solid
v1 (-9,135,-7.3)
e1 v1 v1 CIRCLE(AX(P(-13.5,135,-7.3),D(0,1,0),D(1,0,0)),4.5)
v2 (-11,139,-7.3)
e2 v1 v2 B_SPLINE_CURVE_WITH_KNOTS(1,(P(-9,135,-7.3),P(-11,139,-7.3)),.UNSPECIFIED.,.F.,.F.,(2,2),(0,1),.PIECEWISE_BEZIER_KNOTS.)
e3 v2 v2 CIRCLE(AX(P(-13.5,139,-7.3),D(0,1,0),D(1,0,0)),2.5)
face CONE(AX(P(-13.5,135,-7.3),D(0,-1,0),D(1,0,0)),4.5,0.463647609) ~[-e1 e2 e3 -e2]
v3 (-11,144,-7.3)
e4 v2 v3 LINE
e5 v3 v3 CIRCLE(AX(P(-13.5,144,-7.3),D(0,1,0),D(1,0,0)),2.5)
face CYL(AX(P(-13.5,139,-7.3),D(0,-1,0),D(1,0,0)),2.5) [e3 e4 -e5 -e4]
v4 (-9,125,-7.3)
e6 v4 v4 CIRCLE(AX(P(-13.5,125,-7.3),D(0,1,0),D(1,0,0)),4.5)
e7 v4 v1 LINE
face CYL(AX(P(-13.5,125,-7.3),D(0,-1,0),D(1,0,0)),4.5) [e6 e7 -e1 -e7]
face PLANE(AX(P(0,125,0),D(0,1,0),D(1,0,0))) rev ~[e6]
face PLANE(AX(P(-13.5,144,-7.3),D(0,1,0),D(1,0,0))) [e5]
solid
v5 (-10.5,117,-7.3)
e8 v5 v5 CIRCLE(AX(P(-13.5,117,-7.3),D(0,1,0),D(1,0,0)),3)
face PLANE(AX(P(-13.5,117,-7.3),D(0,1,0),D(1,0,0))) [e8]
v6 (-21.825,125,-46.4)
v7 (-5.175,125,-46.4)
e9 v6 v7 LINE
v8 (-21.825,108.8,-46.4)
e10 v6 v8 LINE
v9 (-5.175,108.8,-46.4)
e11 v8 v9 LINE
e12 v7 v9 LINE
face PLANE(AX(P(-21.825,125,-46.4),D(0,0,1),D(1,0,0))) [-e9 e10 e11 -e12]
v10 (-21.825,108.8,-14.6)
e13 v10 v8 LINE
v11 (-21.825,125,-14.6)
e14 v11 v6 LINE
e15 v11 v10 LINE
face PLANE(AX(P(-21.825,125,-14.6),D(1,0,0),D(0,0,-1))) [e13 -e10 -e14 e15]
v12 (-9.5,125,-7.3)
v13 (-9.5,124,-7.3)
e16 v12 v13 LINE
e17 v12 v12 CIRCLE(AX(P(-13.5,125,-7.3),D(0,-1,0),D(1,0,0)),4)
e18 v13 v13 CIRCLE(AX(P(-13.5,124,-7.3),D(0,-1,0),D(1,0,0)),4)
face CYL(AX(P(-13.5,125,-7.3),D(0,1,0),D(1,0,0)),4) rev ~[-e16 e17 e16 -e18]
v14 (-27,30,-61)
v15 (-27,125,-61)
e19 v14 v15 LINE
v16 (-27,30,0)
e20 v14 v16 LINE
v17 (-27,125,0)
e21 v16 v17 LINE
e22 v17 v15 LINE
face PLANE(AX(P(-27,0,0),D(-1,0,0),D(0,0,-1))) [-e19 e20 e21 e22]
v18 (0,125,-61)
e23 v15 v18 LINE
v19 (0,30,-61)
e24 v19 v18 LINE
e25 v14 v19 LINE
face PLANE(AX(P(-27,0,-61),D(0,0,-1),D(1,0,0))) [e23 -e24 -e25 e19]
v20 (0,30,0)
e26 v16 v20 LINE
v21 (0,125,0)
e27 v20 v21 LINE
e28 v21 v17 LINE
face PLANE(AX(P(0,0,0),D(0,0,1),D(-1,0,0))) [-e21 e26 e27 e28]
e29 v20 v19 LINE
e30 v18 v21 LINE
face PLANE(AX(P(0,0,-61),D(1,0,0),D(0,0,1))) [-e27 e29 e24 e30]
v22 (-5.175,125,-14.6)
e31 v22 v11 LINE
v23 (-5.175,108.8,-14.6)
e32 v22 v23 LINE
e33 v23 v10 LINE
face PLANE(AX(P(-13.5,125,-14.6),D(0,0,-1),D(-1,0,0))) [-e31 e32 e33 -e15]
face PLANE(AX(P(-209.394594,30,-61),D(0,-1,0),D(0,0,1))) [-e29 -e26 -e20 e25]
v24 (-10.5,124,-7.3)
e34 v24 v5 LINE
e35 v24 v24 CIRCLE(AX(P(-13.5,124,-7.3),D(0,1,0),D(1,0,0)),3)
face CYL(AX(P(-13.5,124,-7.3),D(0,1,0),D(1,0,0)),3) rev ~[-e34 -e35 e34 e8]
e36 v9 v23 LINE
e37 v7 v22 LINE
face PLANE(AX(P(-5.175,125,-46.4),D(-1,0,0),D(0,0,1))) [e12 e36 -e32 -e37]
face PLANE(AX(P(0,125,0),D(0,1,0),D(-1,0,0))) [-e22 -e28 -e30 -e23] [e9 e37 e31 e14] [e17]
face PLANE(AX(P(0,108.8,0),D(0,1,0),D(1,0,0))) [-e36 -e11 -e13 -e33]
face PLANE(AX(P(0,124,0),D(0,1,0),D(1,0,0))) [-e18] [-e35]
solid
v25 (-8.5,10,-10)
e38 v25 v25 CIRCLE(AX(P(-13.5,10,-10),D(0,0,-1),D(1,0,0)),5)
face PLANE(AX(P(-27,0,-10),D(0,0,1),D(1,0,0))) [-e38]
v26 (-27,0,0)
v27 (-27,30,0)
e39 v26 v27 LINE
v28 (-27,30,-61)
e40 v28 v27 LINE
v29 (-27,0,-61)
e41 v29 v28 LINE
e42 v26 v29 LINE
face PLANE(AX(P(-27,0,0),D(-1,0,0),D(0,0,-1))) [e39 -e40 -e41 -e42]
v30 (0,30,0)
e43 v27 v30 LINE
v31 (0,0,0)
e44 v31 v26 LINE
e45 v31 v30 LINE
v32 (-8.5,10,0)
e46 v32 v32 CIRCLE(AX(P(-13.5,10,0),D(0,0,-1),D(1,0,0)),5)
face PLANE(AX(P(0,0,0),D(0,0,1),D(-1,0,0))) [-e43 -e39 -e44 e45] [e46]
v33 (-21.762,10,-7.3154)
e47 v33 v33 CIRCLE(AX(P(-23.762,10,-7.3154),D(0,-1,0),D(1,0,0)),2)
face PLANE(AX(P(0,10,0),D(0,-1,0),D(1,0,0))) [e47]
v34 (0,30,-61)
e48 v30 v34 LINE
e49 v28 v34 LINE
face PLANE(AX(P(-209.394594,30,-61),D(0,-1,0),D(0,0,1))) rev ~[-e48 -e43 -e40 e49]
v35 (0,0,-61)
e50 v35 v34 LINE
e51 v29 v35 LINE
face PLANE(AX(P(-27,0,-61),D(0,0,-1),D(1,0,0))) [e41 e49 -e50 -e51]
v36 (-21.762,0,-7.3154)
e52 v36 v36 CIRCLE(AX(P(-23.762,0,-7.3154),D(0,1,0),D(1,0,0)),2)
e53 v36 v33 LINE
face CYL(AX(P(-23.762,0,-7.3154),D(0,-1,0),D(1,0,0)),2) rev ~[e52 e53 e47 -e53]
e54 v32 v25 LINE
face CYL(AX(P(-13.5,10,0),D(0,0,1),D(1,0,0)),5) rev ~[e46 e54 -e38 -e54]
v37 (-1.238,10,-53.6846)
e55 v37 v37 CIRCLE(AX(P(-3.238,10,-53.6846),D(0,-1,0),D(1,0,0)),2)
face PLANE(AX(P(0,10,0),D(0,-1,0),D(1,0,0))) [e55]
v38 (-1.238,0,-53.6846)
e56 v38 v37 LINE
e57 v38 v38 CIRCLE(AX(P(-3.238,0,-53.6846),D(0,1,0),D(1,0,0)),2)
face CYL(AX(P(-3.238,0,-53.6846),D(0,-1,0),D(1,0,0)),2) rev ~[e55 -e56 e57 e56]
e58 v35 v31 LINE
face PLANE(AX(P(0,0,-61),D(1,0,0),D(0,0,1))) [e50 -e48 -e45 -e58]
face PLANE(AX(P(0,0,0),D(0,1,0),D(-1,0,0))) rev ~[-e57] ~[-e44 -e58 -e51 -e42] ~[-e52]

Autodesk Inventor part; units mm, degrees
ref_plane "YZ Plane" through (0, 0, 0) normal (1, 0, 0) x (0, 1, 0)
ref_plane "XZ Plane" through (0, 0, 0) normal (0, 1, 0) x (-1, 0, 0)
sketch "Sketch1" plane through (0, 0, 0) normal (0, 1, 0) x (-1, 0, 0)
  line L0 (0, 0) -> (27, 0)
  line L1 (27, 0) -> (27, -61)
  line L2 (27, -61) -> (0, -61)
  line L3 (0, -61) -> (0, 0)
  dimension "d0" = 27
  dimension "d1" = 61
extrude "Extrusion1" add sketch "Sketch1" along normal blind 125
sketch "Sketch2" plane through (0, 0, 0) normal (1, 0, 0) x (0, 0, -1)
  line L0 (61, 0) -> (0, 0) projected
  line L1 (61, 0) -> (61, 125) projected
  line L2 (0, 0) -> (61, 0)
  line L3 (61, 0) -> (61, 30)
  line L4 (61, 30) -> (0, 30)
  line L5 (0, 30) -> (0, 0)
  dimension "d4" = 30
split body "Split1" sketch "Sketch2" result two bodies curves L4 L5 L2 L3 first body at (-0.5, 10, -20.3333)
sketch "Sketch3" plane through (0, 0, 0) normal (0, -1, 0) x (1, 0, 0)
  line L0 (-27, 0) -> (0, 0) projected
  line L1 (-27, -61) -> (-27, 0) projected
  line L2 (0, 0) -> (-27, -61)
  line L3 (-27, -61) -> (-22.9525, -51.8557)
  line L4 (0, 0) -> (-4.0475, -9.1443)
  circle A0 centre (-4.0475, -9.1443) radius 2
  circle A1 centre (-22.9525, -51.8557) radius 2
  line L5 (0, -61) -> (-27, -61) projected
  line L6 (-27, 0) -> (0, -61)
  line L7 (0, -61) -> (-3.238, -53.6846)
  line L8 (-27, 0) -> (-23.762, -7.3154)
  circle A2 centre (-23.762, -7.3154) radius 2
  circle A3 centre (-3.238, -53.6846) radius 2
  dimension "d5" = 10
  dimension "d6" = 10
  dimension "d7" = 4
  dimension "d8" = 4
  dimension "d14" = 8
  dimension "d15" = 8
  dimension "d16" = 4
extrude "Extrusion2" cut sketch "Sketch3" against normal blind 10 contours A2 L6 | L6 A2 | A3 L6 | L6 A3 bodies 2
sketch "Sketch4" plane through (-27, 0, 0) normal (0, 0, 1) x (1, 0, 0)
  line L0 (0, 0) -> (0, 30) projected
  line L1 (0, 0) -> (13.5, 0)
  line L2 (0, 0) -> (27, 0) projected
  line L3 (13.5, 0) -> (13.5, 10)
  circle A0 centre (13.5, 10) radius 5
  dimension "d11" = 10
extrude "Extrusion3" cut sketch "Sketch4" against normal blind 10 bodies 2
sketch "Sketch12" plane through (0, 125, 0) normal (1, 0, 0) x (0, 0, -1)
  line L0 (0.5745, -8.0578) -> (59.8412, -8.0578) construction
  line L1 (59.8412, -8.0578) -> (59.8412, -95.0528) construction
  line L2 (59.8412, -95.0528) -> (0.5745, -95.0528) construction
  line L3 (0.5745, -95.0528) -> (0.5745, -8.0578) construction
  point P0 (0, -125)
decal "Decal2"
sketch "Sketch13" plane through (0, 125, 0) normal (0, 1, 0) x (1, 0, 0)
  line L0 (-27, 0) -> (0, 0) projected
  line L1 (0, 0) -> (-13.5, 0)
  line L2 (-13.5, 0) -> (-13.5, 30.5)
  line L3 (0, 61) -> (-27, 61) projected
  line L4 (-21.825, 46.4) -> (-5.175, 46.4)
  line L5 (-5.175, 46.4) -> (-5.175, 14.6)
  line L6 (-5.175, 14.6) -> (-21.825, 14.6)
  line L7 (-21.825, 14.6) -> (-21.825, 46.4)
  line L8 (-21.825, 46.4) -> (-5.175, 14.6) construction
  line L9 (-5.175, 46.4) -> (-21.825, 14.6) construction
  dimension "d39" = 30.5
  dimension "d40" = 16.65
  dimension "d41" = 31.8
extrude "Extrusion4" cut sketch "Sketch13" against normal blind 16.2 bodies 3
sketch "Sketch14" plane through (0, 125, 0) normal (0, 1, 0) x (1, 0, 0)
  line L0 (-5.175, 14.6) -> (-21.825, 14.6) projected
  line L1 (-13.5, 14.6) -> (-13.5, 7.3)
  line L2 (-27, 0) -> (0, 0) projected
  circle A0 centre (-13.5, 7.3) radius 4
  dimension "d44" = 7.3
  dimension "d45" = 8
extrude "Extrusion5" cut sketch "Sketch14" against normal blind 1 bodies 3
sketch "Sketch15" plane through (-13.5, 124, -7.3) normal (0, 1, 0) x (1, 0, 0)
  circle A0 centre (0, 0) radius 3
  point P0 (13.5, -7.3)
  dimension "d48" = 6
extrude "Extrusion6" cut sketch "Sketch15" against normal blind 7 bodies 3
sketch "Sketch16" plane through (0, 125, 0) normal (0, 1, 0) x (1, 0, 0)
  circle A0 centre (-13.5, 7.3) radius 4 projected
  circle A1 centre (-13.5, 7.3) radius 3 projected
  circle A2 centre (-13.5, 7.3) radius 4.5
  point P0 (0, 0)
  dimension "d51" = 9
extrude "Extrusion7" add sketch "Sketch16" along normal blind 10 separate body contours A0 | A1 | A2
ref_plane "Work Plane4" through (-13.5, 139, -7.3) normal (0, 1, 0) x (1, 0, 0)
sketch "Sketch17" plane through (-13.5, 139, -7.3) normal (0, 1, 0) x (1, 0, 0)
  circle A0 centre (0, 0) radius 2.5
  point P0 (13.5, -7.3)
  dimension "d55" = 5
extrude "Extrusion8" add sketch "Sketch17" along normal blind 5 separate body
loft "Loft1" add bodies 4 section 1 edges at (-18, 135, -7.3) section 2 edges at (-16, 139, -7.3)
combine bodies "Combine1" operation type add bodies to combine 5 4
sketch "Sketch18" plane through (-13.5, 144, -7.3) normal (0, 1, 0) x (1, 0, 0)
  circle A0 centre (0, 0) radius 2.5 projected
sketch "Sketch19" plane through (-27, 125, -61) normal (-1, 0, 0) x (0, 0, 1)
  line L0 (0.9673, -7.4353) -> (60.234, -7.4353) construction
  line L1 (60.234, -7.4353) -> (60.234, -94.4303) construction
  line L2 (60.234, -94.4303) -> (0.9673, -94.4303) construction
  line L3 (0.9673, -94.4303) -> (0.9673, -7.4353) construction
  point P0 (61, -125)
  point P1 (-0.9513, -94.5214)
decal "Decal3"
properties part number "alicat_presion"
